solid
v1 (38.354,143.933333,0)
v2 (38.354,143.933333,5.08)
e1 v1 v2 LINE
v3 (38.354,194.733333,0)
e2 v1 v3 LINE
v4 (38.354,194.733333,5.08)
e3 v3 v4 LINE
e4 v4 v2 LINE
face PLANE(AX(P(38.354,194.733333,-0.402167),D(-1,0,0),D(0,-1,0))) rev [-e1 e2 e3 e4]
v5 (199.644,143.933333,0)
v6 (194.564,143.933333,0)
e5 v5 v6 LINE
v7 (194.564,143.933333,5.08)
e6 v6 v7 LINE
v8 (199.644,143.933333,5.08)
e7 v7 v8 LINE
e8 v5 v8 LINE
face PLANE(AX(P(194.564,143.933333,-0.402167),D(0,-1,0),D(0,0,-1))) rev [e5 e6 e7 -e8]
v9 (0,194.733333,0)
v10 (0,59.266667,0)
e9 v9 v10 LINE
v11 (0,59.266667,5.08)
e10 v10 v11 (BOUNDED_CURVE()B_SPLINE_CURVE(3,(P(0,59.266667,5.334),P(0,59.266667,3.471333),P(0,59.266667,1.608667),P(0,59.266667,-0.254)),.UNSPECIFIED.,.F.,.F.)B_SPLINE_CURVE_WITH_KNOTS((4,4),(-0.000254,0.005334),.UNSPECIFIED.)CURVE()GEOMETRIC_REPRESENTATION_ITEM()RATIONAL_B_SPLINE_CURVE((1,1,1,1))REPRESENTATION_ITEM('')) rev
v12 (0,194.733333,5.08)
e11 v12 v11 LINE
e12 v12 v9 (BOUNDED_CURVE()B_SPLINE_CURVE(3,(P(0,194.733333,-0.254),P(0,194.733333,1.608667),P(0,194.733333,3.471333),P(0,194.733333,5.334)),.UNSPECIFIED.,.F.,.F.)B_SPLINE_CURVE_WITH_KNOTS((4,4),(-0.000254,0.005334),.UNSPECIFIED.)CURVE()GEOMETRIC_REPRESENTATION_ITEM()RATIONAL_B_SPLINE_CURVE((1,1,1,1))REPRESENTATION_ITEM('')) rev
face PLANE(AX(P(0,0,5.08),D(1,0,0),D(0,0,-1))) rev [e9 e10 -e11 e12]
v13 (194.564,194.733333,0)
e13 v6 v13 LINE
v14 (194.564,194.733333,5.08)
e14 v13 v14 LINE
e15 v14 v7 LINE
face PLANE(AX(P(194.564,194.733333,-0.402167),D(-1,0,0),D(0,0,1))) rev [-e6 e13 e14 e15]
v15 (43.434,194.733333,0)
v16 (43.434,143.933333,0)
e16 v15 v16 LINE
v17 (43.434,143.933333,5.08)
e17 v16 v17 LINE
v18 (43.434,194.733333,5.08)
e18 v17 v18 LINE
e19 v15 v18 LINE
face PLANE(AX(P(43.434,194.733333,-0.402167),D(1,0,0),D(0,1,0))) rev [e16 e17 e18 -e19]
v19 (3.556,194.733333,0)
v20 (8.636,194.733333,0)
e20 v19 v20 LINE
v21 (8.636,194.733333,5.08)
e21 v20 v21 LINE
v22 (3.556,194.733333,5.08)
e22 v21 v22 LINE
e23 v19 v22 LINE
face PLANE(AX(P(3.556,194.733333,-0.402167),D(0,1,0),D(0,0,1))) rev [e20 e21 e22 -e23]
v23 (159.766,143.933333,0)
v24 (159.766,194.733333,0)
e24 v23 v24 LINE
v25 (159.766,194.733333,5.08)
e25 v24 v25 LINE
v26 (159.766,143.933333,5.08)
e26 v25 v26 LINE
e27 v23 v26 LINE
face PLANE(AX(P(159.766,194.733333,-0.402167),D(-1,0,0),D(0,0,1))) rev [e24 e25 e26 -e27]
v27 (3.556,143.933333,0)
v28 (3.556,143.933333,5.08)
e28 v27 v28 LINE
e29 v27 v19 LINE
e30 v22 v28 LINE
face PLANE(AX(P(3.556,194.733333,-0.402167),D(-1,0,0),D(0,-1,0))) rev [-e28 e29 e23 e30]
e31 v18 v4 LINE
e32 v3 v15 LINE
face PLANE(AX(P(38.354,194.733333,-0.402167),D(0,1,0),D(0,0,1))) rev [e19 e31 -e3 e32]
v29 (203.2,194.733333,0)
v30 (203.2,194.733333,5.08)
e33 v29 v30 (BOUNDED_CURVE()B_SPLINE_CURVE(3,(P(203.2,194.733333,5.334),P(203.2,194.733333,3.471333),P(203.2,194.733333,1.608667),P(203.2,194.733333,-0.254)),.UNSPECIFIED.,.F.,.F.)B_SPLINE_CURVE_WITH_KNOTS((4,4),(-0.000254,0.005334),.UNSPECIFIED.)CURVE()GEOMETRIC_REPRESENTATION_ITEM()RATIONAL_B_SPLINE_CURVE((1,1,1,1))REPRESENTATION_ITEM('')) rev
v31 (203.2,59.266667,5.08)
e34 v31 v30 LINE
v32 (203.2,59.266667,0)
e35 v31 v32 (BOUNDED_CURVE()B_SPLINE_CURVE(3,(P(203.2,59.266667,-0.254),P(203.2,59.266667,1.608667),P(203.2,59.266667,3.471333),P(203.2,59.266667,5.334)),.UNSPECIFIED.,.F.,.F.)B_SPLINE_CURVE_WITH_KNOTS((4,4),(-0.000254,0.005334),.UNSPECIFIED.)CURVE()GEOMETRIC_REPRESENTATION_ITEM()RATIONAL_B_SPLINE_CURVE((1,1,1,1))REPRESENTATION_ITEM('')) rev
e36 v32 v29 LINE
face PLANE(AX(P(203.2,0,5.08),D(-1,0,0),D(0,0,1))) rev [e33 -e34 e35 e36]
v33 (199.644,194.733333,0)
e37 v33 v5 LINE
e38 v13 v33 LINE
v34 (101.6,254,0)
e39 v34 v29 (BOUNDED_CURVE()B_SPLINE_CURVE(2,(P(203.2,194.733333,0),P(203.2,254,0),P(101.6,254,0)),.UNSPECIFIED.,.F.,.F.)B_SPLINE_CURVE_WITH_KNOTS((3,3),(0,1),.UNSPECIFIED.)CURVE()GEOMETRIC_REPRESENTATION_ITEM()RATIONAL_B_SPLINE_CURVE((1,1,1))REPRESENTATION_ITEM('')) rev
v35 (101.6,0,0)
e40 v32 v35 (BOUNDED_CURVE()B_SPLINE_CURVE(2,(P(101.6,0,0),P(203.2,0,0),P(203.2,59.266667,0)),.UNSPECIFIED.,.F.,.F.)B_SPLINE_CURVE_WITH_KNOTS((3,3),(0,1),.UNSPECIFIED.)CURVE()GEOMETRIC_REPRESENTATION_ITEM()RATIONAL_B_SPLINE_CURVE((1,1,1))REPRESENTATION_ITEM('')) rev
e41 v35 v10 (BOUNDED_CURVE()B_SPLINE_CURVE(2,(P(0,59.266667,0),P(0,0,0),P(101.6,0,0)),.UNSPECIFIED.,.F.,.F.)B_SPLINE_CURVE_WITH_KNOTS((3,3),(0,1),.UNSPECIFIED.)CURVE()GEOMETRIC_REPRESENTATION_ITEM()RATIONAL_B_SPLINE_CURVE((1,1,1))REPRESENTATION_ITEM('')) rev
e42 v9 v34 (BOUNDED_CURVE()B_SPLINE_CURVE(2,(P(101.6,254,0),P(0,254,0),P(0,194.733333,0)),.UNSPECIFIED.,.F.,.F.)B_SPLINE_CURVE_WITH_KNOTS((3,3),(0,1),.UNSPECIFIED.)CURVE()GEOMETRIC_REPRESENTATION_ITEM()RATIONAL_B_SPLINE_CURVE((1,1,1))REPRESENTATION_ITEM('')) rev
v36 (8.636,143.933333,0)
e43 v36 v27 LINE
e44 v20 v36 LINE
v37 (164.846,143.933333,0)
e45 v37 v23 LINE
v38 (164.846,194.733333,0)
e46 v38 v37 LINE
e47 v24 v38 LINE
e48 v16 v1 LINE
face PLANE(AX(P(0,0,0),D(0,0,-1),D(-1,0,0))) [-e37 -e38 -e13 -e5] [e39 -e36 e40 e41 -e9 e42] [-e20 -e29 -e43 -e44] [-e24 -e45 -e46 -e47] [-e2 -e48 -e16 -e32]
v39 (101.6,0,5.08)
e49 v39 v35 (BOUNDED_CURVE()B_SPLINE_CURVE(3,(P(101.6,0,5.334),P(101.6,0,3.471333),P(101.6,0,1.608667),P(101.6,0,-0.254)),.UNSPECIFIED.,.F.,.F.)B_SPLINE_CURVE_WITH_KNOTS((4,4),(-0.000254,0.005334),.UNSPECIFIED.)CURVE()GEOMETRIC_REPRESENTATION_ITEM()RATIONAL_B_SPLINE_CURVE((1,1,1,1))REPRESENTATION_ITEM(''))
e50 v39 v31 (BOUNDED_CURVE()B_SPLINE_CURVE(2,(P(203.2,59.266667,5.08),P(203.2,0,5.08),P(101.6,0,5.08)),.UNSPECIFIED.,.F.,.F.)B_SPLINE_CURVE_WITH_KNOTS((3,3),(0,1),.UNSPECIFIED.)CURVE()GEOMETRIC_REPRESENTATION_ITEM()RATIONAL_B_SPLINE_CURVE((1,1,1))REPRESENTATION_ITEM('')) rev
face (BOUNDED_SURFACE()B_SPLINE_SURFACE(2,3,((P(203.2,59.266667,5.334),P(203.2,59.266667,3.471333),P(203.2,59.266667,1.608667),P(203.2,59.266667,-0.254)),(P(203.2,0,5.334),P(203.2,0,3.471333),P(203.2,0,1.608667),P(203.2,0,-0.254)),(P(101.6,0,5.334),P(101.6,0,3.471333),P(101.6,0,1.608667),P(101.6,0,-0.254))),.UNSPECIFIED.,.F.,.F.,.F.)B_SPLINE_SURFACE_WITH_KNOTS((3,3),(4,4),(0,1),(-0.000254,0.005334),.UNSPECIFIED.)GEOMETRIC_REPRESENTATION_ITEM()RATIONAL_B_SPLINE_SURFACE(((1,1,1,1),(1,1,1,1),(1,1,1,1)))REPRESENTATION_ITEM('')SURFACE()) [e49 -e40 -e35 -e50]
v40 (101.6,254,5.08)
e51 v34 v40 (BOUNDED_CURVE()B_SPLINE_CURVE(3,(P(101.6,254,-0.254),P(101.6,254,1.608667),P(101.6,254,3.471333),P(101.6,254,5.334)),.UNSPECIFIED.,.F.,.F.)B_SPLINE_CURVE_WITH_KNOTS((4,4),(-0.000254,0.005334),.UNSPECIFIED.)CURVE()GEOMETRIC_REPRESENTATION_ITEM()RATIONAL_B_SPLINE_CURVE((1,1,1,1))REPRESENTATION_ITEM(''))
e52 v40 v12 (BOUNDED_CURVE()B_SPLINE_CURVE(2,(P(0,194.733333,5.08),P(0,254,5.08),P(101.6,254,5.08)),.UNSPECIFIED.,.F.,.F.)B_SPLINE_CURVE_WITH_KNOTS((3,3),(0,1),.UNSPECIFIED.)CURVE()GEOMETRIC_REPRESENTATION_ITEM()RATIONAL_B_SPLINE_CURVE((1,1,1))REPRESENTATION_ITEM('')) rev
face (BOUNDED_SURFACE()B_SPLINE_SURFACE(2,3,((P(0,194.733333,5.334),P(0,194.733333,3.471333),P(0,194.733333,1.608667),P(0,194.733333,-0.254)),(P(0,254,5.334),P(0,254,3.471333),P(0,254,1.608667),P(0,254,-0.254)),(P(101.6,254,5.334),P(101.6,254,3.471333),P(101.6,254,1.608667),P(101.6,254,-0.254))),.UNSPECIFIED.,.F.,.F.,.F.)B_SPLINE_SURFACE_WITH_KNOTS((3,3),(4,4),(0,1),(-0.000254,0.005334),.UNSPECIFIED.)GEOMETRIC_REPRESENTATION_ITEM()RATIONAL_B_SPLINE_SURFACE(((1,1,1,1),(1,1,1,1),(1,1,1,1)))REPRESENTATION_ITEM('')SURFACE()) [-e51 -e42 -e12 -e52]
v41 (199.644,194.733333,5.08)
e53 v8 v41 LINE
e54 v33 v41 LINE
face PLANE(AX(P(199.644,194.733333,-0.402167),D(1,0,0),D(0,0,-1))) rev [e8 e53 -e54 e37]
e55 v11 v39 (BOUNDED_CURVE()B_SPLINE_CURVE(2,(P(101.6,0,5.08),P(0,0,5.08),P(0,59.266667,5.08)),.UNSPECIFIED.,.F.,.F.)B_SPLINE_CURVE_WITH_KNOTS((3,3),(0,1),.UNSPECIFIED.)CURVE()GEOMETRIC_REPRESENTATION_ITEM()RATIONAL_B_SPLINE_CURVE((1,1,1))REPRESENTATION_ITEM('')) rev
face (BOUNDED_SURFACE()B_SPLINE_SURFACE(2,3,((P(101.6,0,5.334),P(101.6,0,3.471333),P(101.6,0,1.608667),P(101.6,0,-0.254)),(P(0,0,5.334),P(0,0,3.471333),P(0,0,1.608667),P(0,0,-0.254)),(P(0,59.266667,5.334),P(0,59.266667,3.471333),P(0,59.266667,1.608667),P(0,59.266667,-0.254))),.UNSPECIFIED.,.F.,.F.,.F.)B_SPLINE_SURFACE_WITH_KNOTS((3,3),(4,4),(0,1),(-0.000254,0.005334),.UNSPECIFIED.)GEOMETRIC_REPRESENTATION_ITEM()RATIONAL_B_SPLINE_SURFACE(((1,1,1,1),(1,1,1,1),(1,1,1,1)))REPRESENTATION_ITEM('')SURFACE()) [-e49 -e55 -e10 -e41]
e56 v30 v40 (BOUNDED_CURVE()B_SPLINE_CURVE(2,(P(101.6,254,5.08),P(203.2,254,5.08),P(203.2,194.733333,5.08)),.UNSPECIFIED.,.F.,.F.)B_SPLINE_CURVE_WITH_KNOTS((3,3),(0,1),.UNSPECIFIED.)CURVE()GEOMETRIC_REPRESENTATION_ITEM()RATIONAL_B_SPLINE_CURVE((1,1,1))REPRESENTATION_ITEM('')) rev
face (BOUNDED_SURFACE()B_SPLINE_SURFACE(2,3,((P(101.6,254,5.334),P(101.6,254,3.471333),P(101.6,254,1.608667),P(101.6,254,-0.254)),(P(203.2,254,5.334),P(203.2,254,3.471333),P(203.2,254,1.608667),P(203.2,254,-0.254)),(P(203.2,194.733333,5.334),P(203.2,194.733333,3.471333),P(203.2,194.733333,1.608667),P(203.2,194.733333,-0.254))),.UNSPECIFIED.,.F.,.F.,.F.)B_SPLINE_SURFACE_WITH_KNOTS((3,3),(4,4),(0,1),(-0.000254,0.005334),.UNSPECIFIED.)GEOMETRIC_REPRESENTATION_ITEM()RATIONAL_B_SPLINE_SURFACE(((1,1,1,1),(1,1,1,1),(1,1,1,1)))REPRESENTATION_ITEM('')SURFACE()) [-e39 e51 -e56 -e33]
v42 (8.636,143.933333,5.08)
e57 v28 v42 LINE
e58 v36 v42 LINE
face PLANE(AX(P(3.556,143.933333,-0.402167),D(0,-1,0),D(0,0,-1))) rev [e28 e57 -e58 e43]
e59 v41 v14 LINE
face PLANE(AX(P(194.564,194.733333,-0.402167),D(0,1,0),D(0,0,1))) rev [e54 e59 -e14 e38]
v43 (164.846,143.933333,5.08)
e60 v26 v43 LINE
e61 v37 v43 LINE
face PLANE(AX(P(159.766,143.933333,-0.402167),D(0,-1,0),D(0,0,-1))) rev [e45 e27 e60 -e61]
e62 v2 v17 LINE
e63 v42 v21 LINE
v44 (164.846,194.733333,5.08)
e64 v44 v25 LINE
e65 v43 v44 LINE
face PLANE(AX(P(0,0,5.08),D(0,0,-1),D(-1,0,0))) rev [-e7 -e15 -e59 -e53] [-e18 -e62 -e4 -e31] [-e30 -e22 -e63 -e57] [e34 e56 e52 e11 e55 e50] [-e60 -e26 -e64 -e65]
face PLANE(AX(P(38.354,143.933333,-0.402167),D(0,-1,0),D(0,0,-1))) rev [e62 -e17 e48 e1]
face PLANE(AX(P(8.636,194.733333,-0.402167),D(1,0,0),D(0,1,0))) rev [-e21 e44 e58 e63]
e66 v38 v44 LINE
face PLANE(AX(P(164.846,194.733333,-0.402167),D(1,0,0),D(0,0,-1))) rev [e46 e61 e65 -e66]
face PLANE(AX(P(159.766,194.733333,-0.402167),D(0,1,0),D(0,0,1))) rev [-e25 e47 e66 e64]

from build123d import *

# Parameters (mm, degrees)
SKETCH1_W           = 203.2
SKETCH1_H           = 254
BOSS_EXTRUDE1_DEPTH = 5.08
FILLET1_SIZE        = 59.266666667
FILLET1_SIZE_2      = 101.6
SKETCH7_W           = 5.08
SKETCH7_H           = 50.8
CUT_EXTRUDE1_DEPTH  = 326.318377121


with BuildPart() as part:
    # Sketch1 → Boss-Extrude1 (new body)
    with BuildSketch(Plane.XY):
        with Locations((101.6, 127)):
            Rectangle(SKETCH1_W, SKETCH1_H)
    extrude(amount=BOSS_EXTRUDE1_DEPTH)

    # Fillet1
    # a fillet whose section is not a circle: 101.6, 59.266666667 mm, written as the material it takes off along each edge
    with BuildSketch(Plane(origin=(203.2, 254, -254), x_dir=(0, -1, 0), z_dir=(0, 0, 1))) as fillet1_piece_1:
        with BuildLine():
            Bezier((FILLET1_SIZE, 0), (0, 0), (0, -FILLET1_SIZE_2), weights=[1, 1, 1])
            Line((0, -FILLET1_SIZE_2), (0, 0))
            Line((0, 0), (FILLET1_SIZE, 0))
        make_face()
    extrude(amount=513.08, mode=Mode.SUBTRACT)
    with BuildSketch(Plane(origin=(0, 254, -254), x_dir=(1, 0, 0), z_dir=(0, 0, 1)), Plane(origin=(203.2, 0, -254), x_dir=(-1, 0, 0), z_dir=(0, 0, 1))) as fillet1_piece_2:
        with BuildLine():
            Bezier((FILLET1_SIZE_2, 0), (0, 0), (0, -FILLET1_SIZE), weights=[1, 1, 1])
            Line((0, -FILLET1_SIZE), (0, 0))
            Line((0, 0), (FILLET1_SIZE_2, 0))
        make_face()
    extrude(amount=513.08, mode=Mode.SUBTRACT)
    with BuildSketch(Plane(origin=(0, 0, -254), x_dir=(1, 0, 0), z_dir=(0, 0, 1))) as fillet1_piece_3:
        with BuildLine():
            Bezier((FILLET1_SIZE_2, 0), (0, 0), (0, FILLET1_SIZE), weights=[1, 1, 1])
            Line((0, FILLET1_SIZE), (0, 0))
            Line((0, 0), (FILLET1_SIZE_2, 0))
        make_face()
    extrude(amount=513.08, mode=Mode.SUBTRACT)

    # Sketch7 → Cut-Extrude1 (cut, through all)
    with BuildSketch(Plane.XY.offset(5.08)):
        with Locations((6.096, 169.333333333)):
            Rectangle(SKETCH7_W, SKETCH7_H)
        with Locations((40.894, 169.333333333)):
            Rectangle(SKETCH7_W, SKETCH7_H)
        with Locations((197.104, 169.333333333)):
            Rectangle(SKETCH7_W, SKETCH7_H)
        with Locations((162.306, 169.333333333)):
            Rectangle(SKETCH7_W, SKETCH7_H)
    extrude(amount=-CUT_EXTRUDE1_DEPTH, mode=Mode.SUBTRACT)


solid = part.part
